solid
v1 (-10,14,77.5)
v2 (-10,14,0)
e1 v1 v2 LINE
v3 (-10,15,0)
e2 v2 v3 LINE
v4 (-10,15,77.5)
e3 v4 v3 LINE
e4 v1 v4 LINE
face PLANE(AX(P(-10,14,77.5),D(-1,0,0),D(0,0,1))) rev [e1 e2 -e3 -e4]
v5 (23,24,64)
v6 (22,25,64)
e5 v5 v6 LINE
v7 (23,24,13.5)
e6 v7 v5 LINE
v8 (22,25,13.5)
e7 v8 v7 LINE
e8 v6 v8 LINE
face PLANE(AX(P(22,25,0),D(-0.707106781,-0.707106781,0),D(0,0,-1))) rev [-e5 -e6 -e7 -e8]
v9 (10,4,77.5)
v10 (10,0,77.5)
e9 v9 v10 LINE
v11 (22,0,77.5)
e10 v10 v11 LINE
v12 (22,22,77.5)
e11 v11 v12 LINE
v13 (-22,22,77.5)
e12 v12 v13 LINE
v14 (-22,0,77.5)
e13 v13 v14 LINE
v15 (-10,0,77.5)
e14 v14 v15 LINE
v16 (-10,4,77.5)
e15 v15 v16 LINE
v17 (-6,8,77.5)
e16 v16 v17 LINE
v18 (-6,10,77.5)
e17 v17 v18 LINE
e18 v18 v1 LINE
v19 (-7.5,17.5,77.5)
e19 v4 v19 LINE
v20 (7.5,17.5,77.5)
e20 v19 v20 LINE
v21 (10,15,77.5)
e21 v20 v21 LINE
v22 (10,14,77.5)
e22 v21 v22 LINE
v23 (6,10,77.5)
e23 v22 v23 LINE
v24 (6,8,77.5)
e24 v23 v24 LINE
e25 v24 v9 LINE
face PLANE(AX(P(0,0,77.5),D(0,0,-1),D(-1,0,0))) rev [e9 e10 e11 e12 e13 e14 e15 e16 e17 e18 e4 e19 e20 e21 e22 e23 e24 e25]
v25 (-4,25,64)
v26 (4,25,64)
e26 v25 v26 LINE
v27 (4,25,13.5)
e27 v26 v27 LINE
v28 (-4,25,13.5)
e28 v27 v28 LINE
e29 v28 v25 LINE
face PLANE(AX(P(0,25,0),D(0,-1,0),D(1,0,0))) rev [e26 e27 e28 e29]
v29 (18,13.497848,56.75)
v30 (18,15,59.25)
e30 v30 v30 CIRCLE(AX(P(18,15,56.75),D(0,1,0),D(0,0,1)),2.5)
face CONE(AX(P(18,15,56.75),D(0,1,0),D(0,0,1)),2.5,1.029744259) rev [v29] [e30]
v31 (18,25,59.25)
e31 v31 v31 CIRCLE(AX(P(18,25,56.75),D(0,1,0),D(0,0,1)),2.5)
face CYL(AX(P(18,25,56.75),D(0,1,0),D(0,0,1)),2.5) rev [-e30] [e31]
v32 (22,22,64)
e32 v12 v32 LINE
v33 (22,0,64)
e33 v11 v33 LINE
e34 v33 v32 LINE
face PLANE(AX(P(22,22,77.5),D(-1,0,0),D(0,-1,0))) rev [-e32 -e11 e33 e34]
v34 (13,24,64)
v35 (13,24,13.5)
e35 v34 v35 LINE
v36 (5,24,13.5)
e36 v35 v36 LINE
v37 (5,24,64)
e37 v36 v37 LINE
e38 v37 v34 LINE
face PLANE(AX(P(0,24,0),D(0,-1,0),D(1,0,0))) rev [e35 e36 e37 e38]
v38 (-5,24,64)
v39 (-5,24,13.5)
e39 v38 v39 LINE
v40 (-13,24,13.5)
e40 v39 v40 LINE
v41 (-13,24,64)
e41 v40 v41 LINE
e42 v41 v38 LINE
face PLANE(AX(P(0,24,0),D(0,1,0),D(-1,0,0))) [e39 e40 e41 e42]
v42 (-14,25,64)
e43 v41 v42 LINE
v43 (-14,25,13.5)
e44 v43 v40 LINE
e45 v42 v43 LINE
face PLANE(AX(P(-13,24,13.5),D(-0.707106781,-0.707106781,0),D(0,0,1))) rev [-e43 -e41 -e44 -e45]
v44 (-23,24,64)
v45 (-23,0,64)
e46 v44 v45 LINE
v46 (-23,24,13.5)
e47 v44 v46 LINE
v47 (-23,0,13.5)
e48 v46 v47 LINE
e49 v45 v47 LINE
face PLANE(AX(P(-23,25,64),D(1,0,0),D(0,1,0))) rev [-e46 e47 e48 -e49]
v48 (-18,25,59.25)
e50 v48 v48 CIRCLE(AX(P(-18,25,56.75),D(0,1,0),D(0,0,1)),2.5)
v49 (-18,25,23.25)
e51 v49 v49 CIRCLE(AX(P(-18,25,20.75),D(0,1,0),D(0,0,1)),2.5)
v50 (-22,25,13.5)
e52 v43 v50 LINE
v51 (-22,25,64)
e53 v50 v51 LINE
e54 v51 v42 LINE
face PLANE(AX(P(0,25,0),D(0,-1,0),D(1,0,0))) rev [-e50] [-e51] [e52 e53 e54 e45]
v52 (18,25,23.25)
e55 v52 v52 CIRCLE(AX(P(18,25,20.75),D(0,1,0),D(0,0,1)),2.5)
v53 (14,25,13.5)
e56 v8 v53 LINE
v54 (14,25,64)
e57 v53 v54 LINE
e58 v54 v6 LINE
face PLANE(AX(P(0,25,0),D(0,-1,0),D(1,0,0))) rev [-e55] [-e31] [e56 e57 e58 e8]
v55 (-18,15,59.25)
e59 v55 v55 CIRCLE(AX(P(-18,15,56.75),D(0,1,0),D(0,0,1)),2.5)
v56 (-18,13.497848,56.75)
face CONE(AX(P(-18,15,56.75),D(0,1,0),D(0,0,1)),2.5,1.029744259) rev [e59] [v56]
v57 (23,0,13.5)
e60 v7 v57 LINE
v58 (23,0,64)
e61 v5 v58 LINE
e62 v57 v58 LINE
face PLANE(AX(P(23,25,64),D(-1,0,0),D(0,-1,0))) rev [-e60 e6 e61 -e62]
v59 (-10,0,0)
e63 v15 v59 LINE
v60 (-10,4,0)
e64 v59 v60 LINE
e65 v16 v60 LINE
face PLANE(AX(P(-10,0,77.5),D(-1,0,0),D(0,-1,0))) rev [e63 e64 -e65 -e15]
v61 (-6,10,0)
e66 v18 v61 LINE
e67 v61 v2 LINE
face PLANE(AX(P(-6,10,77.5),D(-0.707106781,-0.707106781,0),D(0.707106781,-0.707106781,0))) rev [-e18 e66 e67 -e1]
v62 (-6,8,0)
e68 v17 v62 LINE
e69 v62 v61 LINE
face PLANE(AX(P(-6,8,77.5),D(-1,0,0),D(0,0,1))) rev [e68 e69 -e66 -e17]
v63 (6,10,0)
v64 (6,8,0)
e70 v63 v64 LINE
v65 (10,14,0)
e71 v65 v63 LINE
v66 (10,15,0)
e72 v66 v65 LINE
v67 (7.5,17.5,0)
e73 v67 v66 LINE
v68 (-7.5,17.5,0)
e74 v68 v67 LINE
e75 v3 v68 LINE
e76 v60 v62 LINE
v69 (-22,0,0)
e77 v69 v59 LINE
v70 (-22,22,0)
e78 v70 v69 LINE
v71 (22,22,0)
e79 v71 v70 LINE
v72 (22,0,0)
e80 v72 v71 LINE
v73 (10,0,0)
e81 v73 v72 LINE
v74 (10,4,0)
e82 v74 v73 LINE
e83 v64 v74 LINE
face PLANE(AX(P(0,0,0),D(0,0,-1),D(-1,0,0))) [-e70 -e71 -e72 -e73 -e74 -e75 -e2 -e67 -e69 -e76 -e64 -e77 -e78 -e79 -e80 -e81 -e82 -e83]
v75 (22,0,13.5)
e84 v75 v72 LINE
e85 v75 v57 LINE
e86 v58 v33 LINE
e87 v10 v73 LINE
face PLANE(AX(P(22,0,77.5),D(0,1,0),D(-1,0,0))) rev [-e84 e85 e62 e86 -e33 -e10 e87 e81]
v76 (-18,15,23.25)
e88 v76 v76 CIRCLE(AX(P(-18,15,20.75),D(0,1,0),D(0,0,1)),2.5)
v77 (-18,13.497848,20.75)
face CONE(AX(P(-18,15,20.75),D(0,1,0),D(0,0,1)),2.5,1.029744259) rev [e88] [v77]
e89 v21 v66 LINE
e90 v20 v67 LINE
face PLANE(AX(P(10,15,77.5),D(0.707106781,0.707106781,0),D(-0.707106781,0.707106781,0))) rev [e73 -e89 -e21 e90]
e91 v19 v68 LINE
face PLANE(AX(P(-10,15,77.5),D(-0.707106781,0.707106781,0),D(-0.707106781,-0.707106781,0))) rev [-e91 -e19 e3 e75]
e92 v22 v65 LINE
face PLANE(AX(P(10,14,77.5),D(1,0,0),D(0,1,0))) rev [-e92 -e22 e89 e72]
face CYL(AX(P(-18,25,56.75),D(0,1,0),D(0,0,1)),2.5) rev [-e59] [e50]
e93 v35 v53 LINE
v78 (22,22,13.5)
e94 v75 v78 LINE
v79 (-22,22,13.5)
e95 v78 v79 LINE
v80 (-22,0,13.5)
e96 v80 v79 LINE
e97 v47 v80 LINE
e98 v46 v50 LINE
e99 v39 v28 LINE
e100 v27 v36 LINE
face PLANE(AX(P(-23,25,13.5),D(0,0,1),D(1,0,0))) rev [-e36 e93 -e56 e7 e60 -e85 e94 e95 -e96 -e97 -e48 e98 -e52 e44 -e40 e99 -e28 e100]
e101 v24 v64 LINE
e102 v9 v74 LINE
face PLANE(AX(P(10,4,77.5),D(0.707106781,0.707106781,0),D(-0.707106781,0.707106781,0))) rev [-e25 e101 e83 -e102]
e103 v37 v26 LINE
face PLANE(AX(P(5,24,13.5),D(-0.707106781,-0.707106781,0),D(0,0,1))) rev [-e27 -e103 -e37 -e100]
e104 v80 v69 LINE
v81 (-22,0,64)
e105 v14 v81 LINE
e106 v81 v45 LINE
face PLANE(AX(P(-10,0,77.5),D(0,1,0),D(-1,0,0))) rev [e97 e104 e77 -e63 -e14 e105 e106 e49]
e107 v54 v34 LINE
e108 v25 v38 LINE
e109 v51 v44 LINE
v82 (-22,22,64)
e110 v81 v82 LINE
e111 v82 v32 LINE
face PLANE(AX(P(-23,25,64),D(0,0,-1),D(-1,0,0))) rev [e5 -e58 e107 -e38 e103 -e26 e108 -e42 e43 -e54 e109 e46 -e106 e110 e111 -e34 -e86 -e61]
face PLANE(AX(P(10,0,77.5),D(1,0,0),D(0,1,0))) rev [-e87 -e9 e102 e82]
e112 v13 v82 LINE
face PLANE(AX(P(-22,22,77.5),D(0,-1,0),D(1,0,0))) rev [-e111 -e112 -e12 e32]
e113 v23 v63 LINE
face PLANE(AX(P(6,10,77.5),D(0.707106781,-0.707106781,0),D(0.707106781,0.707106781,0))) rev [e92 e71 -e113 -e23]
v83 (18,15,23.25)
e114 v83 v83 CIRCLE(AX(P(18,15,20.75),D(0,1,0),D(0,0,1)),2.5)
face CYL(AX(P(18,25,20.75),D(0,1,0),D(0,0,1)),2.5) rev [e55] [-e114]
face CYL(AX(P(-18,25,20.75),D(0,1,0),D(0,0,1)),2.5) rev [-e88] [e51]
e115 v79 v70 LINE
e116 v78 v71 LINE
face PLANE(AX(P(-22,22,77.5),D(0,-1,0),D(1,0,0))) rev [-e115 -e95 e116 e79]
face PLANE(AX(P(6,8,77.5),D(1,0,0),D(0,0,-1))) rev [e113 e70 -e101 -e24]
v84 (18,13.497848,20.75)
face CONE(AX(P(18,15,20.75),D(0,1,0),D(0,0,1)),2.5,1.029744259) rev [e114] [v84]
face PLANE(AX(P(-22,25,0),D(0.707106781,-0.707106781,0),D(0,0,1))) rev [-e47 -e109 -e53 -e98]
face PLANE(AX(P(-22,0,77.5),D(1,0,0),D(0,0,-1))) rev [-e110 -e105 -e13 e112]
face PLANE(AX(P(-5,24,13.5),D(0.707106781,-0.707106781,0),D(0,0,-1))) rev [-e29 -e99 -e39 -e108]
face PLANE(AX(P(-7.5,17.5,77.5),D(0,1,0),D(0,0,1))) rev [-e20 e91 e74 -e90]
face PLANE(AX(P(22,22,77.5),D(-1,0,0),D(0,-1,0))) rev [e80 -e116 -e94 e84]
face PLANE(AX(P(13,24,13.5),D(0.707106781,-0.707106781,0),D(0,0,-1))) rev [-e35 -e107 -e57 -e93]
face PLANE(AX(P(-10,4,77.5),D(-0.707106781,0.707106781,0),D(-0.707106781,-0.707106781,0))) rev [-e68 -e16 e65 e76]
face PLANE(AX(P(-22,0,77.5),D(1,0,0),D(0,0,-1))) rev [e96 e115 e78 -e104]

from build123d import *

# Parameters (mm, degrees)
DODANIE_WYCI_GNI_CIE1_DEPTH    = 77.5
SZKIC2_W                       = 46
SZKIC2_H                       = 50.5
DODANIE_WYCI_GNI_CIE2_DEPTH    = 3
SZKIC3_W                       = 1
SZKIC3_H                       = 50.5
DODANIE_WYCI_GNI_CIE3_DEPTH    = 22
SZKIC4_W                       = 8
SZKIC4_H                       = 50.5
WYTNIJ_WYCI_GNI_CIE1_DEPTH     = 1
SFAZOWANIE1_SIZE               = 1
OTWORY_USTALAJ_CE_5_0MM1_D     = 5
OTWORY_USTALAJ_CE_5_0MM1_DEPTH = 10
OTWORY_USTALAJ_CE_5_0MM1_TIP   = 1.502151548


with BuildPart() as part:
    # Szkic1 → Dodanie-wyciągnięcie1 (new body)
    with BuildSketch(Plane.XY):
        Polygon((-10, 0), (-10, 4), (-6, 8), (-6, 10), (-10, 14), (-10, 15), (-7.5, 17.5), (7.5, 17.5), (10, 15), (10, 14), (6, 10), (6, 8), (10, 4), (10, 0), (22, 0), (22, 22), (-22, 22), (-22, 0), align=None)
    extrude(amount=DODANIE_WYCI_GNI_CIE1_DEPTH)

    # Szkic2 → Dodanie-wyciągnięcie2 (add)
    with BuildSketch(Plane(origin=(0, 22, 0), x_dir=(1, 0, 0), z_dir=(0, 1, 0))):
        with Locations((0, -38.75)):
            Rectangle(SZKIC2_W, SZKIC2_H)
    extrude(amount=DODANIE_WYCI_GNI_CIE2_DEPTH)

    # Szkic3 → Dodanie-wyciągnięcie3 (add)
    with BuildSketch(Plane.XZ.offset(-22)):
        with Locations((-22.5, 38.75)):
            Rectangle(SZKIC3_W, SZKIC3_H)
        with Locations((22.5, 38.75)):
            Rectangle(SZKIC3_W, SZKIC3_H)
    extrude(amount=DODANIE_WYCI_GNI_CIE3_DEPTH)

    # Szkic4 → Wytnij-wyciągnięcie1 (cut)
    with BuildSketch(Plane(origin=(0, 25, 0), x_dir=(1, 0, 0), z_dir=(0, 1, 0))):
        with Locations((-9, -38.75)):
            Rectangle(SZKIC4_W, SZKIC4_H)
        with Locations((9, -38.75)):
            Rectangle(SZKIC4_W, SZKIC4_H)
    extrude(amount=-WYTNIJ_WYCI_GNI_CIE1_DEPTH, mode=Mode.SUBTRACT)

    # Sfazowanie1
    sfazowanie1_edges = [part.edges().sort_by_distance(p)[0] for p in [
        (-23, 25, 38.75),
        (-13, 25, 38.75),
        (-5, 25, 38.75),
        (5, 25, 38.75),
        (13, 25, 38.75),
        (23, 25, 38.75),
    ]]
    chamfer(sfazowanie1_edges, length=SFAZOWANIE1_SIZE - 0.0001)  # a hair under: the kernel refuses the full size

    # Otwory ustalające Ø5.0mm1
    with Locations(Plane(origin=(0, 25, 0), x_dir=(1, 0, 0), z_dir=(0, 1, 0))):
        with Locations((-18, -20.75), (18, -20.75), (18, -56.75), (-18, -56.75)):
            Hole(OTWORY_USTALAJ_CE_5_0MM1_D / 2, depth=OTWORY_USTALAJ_CE_5_0MM1_DEPTH)
            with Locations((0, 0, -(OTWORY_USTALAJ_CE_5_0MM1_DEPTH + OTWORY_USTALAJ_CE_5_0MM1_TIP / 2))):  # 118° drill point
                Cone(0, OTWORY_USTALAJ_CE_5_0MM1_D / 2, OTWORY_USTALAJ_CE_5_0MM1_TIP, mode=Mode.SUBTRACT)


solid = part.part
